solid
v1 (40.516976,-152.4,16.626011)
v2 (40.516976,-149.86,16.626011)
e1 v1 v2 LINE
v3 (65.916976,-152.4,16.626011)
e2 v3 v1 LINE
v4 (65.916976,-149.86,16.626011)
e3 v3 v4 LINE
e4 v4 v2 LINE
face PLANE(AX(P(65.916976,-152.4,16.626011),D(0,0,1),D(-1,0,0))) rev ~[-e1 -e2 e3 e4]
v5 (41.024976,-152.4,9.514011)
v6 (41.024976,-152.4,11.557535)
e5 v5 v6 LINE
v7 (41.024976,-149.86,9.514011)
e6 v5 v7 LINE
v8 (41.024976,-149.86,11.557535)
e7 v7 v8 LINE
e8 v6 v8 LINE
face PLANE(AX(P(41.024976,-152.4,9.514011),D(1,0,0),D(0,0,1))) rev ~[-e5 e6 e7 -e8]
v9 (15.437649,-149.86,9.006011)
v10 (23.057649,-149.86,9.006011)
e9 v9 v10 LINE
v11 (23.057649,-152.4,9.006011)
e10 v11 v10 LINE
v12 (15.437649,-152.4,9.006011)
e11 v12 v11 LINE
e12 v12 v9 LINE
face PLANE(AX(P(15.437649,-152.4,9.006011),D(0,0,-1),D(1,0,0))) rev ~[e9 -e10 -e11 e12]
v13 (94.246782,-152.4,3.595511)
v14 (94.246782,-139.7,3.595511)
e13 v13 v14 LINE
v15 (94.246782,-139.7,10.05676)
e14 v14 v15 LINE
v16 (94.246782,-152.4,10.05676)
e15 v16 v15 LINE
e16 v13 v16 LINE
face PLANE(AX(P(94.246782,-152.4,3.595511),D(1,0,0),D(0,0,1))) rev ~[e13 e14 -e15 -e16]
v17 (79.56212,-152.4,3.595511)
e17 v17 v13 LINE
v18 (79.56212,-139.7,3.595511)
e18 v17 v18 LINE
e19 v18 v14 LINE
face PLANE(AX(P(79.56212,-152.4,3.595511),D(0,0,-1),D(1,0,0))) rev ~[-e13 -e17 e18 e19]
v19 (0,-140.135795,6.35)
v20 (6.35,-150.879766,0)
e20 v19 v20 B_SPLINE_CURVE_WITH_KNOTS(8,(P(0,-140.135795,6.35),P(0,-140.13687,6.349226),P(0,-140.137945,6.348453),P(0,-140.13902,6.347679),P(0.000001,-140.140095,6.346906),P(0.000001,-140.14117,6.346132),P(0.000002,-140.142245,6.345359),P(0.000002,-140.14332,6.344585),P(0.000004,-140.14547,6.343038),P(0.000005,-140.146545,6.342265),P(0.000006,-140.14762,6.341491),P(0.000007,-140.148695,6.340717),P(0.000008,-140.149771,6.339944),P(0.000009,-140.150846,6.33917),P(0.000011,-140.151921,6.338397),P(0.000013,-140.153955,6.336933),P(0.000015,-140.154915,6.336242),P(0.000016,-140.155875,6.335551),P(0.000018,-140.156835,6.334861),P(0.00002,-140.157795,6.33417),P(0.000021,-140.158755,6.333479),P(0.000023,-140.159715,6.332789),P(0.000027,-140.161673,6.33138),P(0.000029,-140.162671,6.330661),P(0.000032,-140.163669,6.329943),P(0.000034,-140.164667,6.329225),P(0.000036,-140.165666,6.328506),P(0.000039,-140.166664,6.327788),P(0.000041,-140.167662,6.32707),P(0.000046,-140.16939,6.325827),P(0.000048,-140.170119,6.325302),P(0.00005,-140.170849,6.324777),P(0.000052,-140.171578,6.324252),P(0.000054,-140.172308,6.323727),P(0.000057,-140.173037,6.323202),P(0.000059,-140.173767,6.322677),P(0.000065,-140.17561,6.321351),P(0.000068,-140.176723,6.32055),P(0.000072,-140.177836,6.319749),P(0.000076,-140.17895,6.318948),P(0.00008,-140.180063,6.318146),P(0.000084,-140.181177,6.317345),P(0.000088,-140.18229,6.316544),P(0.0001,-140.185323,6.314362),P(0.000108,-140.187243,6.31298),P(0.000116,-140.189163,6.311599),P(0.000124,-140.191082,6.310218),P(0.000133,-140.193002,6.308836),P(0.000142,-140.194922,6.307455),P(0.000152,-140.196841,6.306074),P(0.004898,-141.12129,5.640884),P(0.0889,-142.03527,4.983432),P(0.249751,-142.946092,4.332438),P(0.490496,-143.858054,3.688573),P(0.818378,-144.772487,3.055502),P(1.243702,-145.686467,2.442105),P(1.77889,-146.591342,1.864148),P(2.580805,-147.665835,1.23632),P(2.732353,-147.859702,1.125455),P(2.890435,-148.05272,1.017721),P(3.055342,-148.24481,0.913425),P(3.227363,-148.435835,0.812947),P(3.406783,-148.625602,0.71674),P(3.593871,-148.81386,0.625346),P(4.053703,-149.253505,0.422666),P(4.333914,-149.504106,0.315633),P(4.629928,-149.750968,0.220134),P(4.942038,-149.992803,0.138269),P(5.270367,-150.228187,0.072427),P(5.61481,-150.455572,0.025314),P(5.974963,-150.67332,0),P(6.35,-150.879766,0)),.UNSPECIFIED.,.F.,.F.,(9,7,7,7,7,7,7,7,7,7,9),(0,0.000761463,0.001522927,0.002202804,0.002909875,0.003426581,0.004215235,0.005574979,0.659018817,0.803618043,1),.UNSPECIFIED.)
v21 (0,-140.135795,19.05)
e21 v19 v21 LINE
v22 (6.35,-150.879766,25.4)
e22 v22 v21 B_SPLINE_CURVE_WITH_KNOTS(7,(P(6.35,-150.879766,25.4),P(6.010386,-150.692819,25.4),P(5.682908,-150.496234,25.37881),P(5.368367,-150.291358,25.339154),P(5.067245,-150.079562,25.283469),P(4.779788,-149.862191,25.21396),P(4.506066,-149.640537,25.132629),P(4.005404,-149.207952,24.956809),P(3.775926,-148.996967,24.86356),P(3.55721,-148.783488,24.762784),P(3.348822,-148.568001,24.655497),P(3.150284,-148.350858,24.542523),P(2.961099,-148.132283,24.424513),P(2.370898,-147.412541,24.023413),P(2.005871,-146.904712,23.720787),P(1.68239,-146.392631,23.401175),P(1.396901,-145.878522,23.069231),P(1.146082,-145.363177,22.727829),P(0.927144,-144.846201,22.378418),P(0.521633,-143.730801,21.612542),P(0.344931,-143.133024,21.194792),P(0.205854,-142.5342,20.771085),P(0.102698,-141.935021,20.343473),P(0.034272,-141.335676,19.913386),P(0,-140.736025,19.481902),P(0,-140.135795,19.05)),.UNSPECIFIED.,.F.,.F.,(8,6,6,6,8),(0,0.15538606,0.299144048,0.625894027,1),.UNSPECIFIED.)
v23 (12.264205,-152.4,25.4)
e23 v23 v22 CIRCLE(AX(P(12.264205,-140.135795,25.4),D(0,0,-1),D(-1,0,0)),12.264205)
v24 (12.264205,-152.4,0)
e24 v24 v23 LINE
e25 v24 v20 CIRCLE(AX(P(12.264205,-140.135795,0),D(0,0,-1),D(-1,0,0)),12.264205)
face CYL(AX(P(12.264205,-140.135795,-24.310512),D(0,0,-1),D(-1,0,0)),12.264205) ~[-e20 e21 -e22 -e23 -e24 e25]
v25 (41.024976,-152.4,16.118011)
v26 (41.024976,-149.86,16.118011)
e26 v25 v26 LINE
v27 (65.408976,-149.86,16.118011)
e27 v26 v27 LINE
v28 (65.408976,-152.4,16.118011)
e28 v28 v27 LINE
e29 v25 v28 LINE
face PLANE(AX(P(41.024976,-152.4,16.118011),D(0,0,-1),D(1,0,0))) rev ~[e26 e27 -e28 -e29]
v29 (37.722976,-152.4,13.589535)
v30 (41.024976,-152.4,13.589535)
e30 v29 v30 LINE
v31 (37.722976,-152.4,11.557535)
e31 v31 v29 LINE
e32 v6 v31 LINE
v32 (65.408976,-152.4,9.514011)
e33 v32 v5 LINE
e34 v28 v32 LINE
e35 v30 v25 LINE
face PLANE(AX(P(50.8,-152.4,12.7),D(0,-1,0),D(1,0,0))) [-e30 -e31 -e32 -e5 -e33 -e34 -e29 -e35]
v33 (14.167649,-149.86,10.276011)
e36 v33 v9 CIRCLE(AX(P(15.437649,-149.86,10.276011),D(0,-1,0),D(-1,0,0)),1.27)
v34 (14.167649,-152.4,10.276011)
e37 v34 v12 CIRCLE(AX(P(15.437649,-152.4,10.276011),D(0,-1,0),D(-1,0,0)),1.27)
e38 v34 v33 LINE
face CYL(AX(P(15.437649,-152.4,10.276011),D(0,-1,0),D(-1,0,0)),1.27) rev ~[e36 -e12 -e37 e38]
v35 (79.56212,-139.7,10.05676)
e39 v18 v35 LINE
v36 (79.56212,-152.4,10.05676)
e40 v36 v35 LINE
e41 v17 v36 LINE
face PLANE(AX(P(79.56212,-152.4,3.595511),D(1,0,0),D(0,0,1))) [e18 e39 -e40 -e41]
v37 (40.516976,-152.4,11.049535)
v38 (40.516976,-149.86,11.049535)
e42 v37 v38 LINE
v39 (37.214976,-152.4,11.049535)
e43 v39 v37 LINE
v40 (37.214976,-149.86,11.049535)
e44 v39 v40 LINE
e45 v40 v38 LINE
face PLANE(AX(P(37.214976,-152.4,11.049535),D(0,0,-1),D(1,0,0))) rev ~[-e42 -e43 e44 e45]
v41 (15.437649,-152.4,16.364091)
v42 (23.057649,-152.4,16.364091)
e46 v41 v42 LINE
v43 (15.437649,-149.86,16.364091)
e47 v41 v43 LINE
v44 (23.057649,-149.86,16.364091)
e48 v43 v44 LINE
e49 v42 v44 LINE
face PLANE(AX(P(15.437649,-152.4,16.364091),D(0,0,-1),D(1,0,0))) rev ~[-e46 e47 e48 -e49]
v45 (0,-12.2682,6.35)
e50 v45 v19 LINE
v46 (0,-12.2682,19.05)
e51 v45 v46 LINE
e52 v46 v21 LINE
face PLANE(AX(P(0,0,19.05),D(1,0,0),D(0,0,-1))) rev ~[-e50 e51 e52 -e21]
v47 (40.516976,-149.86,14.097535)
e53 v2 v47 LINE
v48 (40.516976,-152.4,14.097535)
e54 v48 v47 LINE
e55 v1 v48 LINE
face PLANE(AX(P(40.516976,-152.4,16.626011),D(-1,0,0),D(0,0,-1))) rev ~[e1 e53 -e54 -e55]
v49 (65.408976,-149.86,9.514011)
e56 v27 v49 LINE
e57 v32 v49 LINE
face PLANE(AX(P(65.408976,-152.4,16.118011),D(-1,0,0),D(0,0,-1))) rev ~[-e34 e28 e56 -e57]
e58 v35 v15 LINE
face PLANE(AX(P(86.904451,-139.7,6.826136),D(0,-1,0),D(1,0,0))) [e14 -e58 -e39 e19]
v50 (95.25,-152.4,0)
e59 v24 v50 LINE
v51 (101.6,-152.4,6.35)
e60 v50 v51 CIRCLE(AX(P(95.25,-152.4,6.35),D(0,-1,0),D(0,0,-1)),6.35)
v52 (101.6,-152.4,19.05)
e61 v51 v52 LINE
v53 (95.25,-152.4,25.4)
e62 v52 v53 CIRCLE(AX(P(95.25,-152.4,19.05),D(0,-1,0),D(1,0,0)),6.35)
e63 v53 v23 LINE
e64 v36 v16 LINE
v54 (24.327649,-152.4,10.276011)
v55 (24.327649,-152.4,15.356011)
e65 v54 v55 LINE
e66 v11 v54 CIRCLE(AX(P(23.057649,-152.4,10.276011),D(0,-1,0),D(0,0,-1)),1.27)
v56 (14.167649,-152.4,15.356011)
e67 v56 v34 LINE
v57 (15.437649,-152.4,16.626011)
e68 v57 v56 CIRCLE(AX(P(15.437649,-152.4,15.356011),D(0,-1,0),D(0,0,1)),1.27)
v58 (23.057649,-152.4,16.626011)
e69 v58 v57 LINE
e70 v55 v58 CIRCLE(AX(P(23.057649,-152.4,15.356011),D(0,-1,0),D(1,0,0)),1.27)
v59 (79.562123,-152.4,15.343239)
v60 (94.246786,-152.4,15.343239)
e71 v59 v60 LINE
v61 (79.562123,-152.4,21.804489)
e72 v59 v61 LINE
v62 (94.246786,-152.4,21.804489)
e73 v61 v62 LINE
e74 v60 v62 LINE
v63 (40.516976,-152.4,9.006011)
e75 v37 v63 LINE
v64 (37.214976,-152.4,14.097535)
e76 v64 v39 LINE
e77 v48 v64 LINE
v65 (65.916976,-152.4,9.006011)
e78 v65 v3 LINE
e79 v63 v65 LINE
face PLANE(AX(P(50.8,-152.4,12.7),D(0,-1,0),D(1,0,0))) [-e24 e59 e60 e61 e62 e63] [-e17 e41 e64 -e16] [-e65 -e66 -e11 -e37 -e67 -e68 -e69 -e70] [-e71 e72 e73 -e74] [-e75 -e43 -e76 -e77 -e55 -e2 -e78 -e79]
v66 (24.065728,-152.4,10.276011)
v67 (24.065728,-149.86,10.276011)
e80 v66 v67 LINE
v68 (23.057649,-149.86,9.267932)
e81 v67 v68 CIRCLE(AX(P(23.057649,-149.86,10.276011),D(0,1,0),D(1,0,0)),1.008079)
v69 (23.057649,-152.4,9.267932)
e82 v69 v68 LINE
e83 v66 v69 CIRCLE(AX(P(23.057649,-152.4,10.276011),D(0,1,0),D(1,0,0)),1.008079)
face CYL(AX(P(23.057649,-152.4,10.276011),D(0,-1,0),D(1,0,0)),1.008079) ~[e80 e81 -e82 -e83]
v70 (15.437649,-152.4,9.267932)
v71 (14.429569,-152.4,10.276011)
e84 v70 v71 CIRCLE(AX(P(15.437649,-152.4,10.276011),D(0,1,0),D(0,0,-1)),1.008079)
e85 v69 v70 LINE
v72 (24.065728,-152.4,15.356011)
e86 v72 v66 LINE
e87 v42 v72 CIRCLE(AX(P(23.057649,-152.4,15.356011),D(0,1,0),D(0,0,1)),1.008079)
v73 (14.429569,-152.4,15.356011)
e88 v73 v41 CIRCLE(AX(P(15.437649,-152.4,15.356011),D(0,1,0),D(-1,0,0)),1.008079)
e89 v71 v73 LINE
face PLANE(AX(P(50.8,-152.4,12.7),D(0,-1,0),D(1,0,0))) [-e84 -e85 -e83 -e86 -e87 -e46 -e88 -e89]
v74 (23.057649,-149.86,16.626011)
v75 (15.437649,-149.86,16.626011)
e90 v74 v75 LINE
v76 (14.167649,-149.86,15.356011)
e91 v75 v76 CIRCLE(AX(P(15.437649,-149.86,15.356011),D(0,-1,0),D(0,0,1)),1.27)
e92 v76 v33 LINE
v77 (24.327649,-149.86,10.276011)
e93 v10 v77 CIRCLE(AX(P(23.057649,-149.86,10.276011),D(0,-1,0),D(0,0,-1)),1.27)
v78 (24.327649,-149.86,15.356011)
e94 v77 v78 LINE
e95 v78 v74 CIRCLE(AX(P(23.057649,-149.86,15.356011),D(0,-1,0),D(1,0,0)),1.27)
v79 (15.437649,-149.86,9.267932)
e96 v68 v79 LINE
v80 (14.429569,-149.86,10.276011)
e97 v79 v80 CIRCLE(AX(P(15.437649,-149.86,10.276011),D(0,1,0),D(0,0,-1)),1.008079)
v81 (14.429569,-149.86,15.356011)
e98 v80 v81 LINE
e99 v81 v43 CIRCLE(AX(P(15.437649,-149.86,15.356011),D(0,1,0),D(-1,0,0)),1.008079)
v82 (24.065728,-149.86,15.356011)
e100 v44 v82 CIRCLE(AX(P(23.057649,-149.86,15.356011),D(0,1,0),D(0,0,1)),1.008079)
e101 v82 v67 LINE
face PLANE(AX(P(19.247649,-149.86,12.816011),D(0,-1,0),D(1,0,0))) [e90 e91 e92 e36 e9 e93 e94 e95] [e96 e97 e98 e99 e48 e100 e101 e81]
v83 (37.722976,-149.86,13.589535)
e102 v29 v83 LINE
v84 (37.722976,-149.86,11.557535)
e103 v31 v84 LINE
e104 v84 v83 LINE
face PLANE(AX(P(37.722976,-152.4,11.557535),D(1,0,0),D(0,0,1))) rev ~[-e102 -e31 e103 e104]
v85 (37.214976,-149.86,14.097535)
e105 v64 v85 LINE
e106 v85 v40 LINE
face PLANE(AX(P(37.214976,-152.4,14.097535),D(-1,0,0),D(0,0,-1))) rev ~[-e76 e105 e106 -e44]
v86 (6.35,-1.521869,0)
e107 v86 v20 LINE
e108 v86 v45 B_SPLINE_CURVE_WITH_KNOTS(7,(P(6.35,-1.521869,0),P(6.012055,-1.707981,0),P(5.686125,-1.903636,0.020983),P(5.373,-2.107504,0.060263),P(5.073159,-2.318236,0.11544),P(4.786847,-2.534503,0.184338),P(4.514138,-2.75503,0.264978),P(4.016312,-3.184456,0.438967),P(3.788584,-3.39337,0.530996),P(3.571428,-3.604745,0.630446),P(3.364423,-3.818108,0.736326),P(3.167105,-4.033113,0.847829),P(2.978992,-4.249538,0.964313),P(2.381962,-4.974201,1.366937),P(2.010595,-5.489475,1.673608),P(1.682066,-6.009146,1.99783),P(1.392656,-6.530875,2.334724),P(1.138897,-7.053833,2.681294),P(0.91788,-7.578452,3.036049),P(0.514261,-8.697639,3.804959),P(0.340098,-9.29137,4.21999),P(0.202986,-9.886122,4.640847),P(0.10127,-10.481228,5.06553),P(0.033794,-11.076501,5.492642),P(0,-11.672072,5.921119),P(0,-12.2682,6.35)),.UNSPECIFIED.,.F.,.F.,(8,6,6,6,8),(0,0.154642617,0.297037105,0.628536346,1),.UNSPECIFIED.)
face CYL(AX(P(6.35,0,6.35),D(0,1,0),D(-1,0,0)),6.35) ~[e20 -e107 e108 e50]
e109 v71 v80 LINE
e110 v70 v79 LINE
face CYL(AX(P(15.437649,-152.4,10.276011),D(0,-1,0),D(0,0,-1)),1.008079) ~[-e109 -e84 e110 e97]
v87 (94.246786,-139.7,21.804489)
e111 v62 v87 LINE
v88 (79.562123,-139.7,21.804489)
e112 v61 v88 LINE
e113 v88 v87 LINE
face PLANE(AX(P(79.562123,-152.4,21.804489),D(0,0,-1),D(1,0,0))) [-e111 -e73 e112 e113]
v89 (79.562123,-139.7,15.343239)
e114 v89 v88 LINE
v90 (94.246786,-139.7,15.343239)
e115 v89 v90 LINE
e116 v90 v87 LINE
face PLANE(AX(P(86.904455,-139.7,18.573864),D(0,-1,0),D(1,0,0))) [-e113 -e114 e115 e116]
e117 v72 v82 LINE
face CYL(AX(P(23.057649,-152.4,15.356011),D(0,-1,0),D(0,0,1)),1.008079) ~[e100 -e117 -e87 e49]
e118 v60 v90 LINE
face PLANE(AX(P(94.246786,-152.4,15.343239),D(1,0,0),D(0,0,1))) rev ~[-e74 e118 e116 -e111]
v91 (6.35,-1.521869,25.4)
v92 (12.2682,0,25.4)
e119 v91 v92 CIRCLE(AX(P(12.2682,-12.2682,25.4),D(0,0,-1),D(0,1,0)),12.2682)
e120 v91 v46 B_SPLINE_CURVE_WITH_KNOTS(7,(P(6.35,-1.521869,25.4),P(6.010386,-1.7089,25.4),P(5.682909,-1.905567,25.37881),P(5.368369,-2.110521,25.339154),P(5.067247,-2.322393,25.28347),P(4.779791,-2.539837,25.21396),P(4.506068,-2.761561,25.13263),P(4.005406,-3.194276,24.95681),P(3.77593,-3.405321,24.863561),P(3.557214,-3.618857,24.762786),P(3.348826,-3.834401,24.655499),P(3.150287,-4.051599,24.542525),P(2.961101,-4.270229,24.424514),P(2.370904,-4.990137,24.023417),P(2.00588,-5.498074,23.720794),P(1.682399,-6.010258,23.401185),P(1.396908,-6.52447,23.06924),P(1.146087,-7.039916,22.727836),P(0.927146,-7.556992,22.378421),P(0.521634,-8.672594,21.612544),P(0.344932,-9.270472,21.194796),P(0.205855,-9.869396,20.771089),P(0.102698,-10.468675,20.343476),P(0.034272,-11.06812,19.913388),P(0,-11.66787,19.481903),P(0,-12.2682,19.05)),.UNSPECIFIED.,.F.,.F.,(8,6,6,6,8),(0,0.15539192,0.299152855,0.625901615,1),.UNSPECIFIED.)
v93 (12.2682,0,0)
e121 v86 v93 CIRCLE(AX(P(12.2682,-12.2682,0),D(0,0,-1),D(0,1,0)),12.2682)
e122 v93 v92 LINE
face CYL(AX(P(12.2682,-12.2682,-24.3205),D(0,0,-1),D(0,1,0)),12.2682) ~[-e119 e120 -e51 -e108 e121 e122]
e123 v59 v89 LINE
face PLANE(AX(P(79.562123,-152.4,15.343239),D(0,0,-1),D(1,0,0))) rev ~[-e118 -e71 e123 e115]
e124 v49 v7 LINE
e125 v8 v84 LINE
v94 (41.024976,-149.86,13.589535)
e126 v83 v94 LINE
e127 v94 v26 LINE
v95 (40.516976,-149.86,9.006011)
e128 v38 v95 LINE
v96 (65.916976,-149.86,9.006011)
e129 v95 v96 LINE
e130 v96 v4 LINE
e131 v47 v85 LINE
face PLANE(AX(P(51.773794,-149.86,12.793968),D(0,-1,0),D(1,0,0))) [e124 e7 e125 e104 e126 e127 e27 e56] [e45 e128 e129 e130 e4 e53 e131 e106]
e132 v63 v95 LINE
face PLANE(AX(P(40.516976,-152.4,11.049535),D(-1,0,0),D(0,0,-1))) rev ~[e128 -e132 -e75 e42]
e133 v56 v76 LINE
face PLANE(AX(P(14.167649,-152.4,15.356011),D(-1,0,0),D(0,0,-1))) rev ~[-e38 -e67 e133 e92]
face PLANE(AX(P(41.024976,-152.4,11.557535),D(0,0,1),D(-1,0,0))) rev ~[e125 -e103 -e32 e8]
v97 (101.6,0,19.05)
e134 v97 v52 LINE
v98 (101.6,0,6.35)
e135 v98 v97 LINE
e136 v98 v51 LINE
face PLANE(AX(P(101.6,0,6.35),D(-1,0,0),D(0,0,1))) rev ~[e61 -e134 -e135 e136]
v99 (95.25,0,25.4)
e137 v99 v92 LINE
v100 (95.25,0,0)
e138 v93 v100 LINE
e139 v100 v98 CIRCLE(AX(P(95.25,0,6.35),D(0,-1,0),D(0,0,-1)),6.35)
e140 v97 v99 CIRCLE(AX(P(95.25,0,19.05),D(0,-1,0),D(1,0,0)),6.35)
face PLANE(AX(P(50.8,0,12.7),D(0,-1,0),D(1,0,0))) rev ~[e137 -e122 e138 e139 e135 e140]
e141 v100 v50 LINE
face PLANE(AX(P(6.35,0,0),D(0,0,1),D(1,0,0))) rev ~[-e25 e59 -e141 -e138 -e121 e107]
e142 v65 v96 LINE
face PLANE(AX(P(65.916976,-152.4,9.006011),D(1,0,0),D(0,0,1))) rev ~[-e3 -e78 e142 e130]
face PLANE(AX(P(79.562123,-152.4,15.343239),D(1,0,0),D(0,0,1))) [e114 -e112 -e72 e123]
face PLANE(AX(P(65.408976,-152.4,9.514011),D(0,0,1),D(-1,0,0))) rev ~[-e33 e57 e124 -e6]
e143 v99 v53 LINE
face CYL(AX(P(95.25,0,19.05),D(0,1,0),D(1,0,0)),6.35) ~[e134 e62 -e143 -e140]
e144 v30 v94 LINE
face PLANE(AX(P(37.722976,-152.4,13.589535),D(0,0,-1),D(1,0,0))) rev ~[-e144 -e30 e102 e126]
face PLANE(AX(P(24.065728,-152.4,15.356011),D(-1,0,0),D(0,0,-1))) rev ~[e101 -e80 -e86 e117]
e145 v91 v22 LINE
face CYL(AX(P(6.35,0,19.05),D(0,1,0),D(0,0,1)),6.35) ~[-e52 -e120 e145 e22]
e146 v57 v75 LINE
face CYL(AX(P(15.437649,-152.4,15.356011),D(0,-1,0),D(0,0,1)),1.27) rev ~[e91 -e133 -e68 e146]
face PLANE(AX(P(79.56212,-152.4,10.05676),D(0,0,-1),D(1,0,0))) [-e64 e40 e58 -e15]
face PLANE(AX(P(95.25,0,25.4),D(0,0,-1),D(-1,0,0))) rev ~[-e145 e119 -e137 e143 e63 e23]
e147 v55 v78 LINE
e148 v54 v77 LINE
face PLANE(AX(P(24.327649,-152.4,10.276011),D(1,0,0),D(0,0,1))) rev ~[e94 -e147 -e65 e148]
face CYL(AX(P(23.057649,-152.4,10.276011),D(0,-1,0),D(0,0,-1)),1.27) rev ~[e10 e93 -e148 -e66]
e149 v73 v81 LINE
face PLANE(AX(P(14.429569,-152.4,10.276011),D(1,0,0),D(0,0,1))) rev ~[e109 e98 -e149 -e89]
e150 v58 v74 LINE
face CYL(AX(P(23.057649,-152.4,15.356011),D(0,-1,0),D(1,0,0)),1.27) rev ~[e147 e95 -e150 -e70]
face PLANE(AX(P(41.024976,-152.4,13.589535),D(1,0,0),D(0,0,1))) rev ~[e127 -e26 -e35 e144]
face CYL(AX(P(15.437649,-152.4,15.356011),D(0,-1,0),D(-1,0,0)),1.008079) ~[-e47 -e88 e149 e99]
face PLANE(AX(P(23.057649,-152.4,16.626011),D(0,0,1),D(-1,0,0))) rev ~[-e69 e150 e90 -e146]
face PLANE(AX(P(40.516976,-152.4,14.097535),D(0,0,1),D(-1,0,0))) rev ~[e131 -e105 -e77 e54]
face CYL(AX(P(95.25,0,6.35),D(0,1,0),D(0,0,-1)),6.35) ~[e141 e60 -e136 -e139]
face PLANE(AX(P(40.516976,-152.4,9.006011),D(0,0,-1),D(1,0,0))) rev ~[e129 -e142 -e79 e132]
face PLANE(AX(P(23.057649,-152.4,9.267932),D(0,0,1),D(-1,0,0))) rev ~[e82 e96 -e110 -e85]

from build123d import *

# Parameters (mm, degrees)
F1_DEPTH    = 152.4
F2_T1_DEPTH = 74.0210244843
F3_T1_DEPTH = 74.041
F4_W        = 14.6846622229
F4_H        = 6.4612496644
F5_DEPTH    = 12.7
F7_DEPTH    = 2.54
F9_DEPTH    = 2.54


# Not quite as in the source:
# - a fillet or chamfer that OpenCascade refuses, or shapes differently, is made with other operations: its cross-section is extruded or revolved along the edge and cut away or added


with BuildPart() as f1:
    # F0 (on Front) → F1 (new body)
    with BuildSketch(Plane.XZ):
        with BuildLine():
            Line((0, 19.05), (0, 6.35))
            ThreePointArc((0, 6.35), (1.8598719395, 1.8598719395), (6.35, 0))
            Line((6.35, 0), (95.25, 0))
            ThreePointArc((95.25, 0), (99.7401280605, 1.8598719395), (101.6, 6.35))
            Line((101.6, 6.35), (101.6, 19.05))
            ThreePointArc((101.6, 19.05), (99.7401280605, 23.5401280605), (95.25, 25.4))
            Line((95.25, 25.4), (6.35, 25.4))
            ThreePointArc((6.35, 25.4), (1.8598719395, 23.5401280605), (0, 19.05))
        make_face()
    extrude(amount=F1_DEPTH)

    # F2: fillet of radius 12.2642048969 on 1 edges, made by hand

    # F2_s2 → F2_t1 (cut)
    with BuildSketch(Plane.XY.offset(-24.3105122421)):
        with BuildLine():
            ThreePointArc((0, -140.1357951031), (3.5921024484, -148.8078975516), (12.2642048969, -152.4))
            Line((12.2642048969, -152.4), (0, -152.4))
            Line((0, -152.4), (0, -140.1357951031))
        make_face()
    extrude(amount=F2_T1_DEPTH, mode=Mode.SUBTRACT)

    # F3: fillet of radius 12.2682 on 1 edges, made by hand

    # F3_s2 → F3_t1 (cut)
    with BuildSketch(Plane.XY.offset(-24.3205)):
        with BuildLine():
            ThreePointArc((12.2682, 0), (3.593272587, -3.593272587), (0, -12.2682))
            Line((0, -12.2682), (0, 0))
            Line((0, 0), (12.2682, 0))
        make_face()
    extrude(amount=F3_T1_DEPTH, mode=Mode.SUBTRACT)

    # F4 (on face) → F5 (cut)
    with BuildSketch(Plane.XZ.offset(152.4)):
        with Locations((86.9044545794, 18.573864289)):
            Rectangle(F4_W, F4_H)
        with Locations((86.904451251, 6.8261355627)):
            Rectangle(F4_W, F4_H)
    extrude(amount=-F5_DEPTH, mode=Mode.SUBTRACT)

    # F6 (on face) → F7 (cut)
    with BuildSketch(Plane.XZ.offset(152.4)):
        Polygon((40.5169758041, 14.0975351255), (37.2149758041, 14.0975351255), (37.2149758041, 11.0495351255), (40.5169758041, 11.0495351255), (40.5169758041, 9.0060108787), (65.9169758041, 9.0060108787), (65.9169758041, 16.6260108787), (40.5169758041, 16.6260108787), align=None)
        Polygon((65.4089756118, 16.1180106864), (65.4089756118, 9.514011071), (41.0249759964, 9.514011071), (41.0249759964, 11.5575353178), (37.7229759964, 11.5575353178), (37.7229759964, 13.5895349332), (41.0249759964, 13.5895349332), (41.0249759964, 16.1180106864), align=None, mode=Mode.SUBTRACT)
    extrude(amount=-F7_DEPTH, mode=Mode.SUBTRACT)

    # F8 (on face) → F9 (cut)
    with BuildSketch(Plane.XZ.offset(152.4)):
        with BuildLine():
            Line((23.0576487401, 16.6260112998), (15.4376487401, 16.6260112998))
            ThreePointArc((15.4376487401, 16.6260112998), (14.539623128, 16.2540369119), (14.1676487401, 15.3560112998))
            Line((14.1676487401, 15.3560112998), (14.1676487401, 10.2760112998))
            ThreePointArc((14.1676487401, 10.2760112998), (14.539623128, 9.3779856877), (15.4376487401, 9.0060112998))
            Line((15.4376487401, 9.0060112998), (23.0576487401, 9.0060112998))
            ThreePointArc((23.0576487401, 9.0060112998), (23.9556743522, 9.3779856877), (24.3276487401, 10.2760112998))
            Line((24.3276487401, 10.2760112998), (24.3276487401, 15.3560112998))
            ThreePointArc((24.3276487401, 15.3560112998), (23.9556743522, 16.2540369119), (23.0576487401, 16.6260112998))
        make_face()
        with BuildLine():
            ThreePointArc((14.4295694742, 15.3560112998), (14.7248290552, 16.0688309847), (15.4376487401, 16.3640905657))
            Line((15.4376487401, 16.3640905657), (23.0576487401, 16.3640905657))
            ThreePointArc((23.0576487401, 16.3640905657), (23.770468425, 16.0688309847), (24.0657280061, 15.3560112998))
            Line((24.0657280061, 15.3560112998), (24.0657280061, 10.2760112998))
            ThreePointArc((24.0657280061, 10.2760112998), (23.770468425, 9.5631916149), (23.0576487401, 9.2679320338))
            Line((23.0576487401, 9.2679320338), (15.4376487401, 9.2679320338))
            ThreePointArc((15.4376487401, 9.2679320338), (14.7248290552, 9.5631916149), (14.4295694742, 10.2760112998))
            Line((14.4295694742, 10.2760112998), (14.4295694742, 15.3560112998))
        make_face(mode=Mode.SUBTRACT)
    extrude(amount=-F9_DEPTH, mode=Mode.SUBTRACT)


solid = f1.part
